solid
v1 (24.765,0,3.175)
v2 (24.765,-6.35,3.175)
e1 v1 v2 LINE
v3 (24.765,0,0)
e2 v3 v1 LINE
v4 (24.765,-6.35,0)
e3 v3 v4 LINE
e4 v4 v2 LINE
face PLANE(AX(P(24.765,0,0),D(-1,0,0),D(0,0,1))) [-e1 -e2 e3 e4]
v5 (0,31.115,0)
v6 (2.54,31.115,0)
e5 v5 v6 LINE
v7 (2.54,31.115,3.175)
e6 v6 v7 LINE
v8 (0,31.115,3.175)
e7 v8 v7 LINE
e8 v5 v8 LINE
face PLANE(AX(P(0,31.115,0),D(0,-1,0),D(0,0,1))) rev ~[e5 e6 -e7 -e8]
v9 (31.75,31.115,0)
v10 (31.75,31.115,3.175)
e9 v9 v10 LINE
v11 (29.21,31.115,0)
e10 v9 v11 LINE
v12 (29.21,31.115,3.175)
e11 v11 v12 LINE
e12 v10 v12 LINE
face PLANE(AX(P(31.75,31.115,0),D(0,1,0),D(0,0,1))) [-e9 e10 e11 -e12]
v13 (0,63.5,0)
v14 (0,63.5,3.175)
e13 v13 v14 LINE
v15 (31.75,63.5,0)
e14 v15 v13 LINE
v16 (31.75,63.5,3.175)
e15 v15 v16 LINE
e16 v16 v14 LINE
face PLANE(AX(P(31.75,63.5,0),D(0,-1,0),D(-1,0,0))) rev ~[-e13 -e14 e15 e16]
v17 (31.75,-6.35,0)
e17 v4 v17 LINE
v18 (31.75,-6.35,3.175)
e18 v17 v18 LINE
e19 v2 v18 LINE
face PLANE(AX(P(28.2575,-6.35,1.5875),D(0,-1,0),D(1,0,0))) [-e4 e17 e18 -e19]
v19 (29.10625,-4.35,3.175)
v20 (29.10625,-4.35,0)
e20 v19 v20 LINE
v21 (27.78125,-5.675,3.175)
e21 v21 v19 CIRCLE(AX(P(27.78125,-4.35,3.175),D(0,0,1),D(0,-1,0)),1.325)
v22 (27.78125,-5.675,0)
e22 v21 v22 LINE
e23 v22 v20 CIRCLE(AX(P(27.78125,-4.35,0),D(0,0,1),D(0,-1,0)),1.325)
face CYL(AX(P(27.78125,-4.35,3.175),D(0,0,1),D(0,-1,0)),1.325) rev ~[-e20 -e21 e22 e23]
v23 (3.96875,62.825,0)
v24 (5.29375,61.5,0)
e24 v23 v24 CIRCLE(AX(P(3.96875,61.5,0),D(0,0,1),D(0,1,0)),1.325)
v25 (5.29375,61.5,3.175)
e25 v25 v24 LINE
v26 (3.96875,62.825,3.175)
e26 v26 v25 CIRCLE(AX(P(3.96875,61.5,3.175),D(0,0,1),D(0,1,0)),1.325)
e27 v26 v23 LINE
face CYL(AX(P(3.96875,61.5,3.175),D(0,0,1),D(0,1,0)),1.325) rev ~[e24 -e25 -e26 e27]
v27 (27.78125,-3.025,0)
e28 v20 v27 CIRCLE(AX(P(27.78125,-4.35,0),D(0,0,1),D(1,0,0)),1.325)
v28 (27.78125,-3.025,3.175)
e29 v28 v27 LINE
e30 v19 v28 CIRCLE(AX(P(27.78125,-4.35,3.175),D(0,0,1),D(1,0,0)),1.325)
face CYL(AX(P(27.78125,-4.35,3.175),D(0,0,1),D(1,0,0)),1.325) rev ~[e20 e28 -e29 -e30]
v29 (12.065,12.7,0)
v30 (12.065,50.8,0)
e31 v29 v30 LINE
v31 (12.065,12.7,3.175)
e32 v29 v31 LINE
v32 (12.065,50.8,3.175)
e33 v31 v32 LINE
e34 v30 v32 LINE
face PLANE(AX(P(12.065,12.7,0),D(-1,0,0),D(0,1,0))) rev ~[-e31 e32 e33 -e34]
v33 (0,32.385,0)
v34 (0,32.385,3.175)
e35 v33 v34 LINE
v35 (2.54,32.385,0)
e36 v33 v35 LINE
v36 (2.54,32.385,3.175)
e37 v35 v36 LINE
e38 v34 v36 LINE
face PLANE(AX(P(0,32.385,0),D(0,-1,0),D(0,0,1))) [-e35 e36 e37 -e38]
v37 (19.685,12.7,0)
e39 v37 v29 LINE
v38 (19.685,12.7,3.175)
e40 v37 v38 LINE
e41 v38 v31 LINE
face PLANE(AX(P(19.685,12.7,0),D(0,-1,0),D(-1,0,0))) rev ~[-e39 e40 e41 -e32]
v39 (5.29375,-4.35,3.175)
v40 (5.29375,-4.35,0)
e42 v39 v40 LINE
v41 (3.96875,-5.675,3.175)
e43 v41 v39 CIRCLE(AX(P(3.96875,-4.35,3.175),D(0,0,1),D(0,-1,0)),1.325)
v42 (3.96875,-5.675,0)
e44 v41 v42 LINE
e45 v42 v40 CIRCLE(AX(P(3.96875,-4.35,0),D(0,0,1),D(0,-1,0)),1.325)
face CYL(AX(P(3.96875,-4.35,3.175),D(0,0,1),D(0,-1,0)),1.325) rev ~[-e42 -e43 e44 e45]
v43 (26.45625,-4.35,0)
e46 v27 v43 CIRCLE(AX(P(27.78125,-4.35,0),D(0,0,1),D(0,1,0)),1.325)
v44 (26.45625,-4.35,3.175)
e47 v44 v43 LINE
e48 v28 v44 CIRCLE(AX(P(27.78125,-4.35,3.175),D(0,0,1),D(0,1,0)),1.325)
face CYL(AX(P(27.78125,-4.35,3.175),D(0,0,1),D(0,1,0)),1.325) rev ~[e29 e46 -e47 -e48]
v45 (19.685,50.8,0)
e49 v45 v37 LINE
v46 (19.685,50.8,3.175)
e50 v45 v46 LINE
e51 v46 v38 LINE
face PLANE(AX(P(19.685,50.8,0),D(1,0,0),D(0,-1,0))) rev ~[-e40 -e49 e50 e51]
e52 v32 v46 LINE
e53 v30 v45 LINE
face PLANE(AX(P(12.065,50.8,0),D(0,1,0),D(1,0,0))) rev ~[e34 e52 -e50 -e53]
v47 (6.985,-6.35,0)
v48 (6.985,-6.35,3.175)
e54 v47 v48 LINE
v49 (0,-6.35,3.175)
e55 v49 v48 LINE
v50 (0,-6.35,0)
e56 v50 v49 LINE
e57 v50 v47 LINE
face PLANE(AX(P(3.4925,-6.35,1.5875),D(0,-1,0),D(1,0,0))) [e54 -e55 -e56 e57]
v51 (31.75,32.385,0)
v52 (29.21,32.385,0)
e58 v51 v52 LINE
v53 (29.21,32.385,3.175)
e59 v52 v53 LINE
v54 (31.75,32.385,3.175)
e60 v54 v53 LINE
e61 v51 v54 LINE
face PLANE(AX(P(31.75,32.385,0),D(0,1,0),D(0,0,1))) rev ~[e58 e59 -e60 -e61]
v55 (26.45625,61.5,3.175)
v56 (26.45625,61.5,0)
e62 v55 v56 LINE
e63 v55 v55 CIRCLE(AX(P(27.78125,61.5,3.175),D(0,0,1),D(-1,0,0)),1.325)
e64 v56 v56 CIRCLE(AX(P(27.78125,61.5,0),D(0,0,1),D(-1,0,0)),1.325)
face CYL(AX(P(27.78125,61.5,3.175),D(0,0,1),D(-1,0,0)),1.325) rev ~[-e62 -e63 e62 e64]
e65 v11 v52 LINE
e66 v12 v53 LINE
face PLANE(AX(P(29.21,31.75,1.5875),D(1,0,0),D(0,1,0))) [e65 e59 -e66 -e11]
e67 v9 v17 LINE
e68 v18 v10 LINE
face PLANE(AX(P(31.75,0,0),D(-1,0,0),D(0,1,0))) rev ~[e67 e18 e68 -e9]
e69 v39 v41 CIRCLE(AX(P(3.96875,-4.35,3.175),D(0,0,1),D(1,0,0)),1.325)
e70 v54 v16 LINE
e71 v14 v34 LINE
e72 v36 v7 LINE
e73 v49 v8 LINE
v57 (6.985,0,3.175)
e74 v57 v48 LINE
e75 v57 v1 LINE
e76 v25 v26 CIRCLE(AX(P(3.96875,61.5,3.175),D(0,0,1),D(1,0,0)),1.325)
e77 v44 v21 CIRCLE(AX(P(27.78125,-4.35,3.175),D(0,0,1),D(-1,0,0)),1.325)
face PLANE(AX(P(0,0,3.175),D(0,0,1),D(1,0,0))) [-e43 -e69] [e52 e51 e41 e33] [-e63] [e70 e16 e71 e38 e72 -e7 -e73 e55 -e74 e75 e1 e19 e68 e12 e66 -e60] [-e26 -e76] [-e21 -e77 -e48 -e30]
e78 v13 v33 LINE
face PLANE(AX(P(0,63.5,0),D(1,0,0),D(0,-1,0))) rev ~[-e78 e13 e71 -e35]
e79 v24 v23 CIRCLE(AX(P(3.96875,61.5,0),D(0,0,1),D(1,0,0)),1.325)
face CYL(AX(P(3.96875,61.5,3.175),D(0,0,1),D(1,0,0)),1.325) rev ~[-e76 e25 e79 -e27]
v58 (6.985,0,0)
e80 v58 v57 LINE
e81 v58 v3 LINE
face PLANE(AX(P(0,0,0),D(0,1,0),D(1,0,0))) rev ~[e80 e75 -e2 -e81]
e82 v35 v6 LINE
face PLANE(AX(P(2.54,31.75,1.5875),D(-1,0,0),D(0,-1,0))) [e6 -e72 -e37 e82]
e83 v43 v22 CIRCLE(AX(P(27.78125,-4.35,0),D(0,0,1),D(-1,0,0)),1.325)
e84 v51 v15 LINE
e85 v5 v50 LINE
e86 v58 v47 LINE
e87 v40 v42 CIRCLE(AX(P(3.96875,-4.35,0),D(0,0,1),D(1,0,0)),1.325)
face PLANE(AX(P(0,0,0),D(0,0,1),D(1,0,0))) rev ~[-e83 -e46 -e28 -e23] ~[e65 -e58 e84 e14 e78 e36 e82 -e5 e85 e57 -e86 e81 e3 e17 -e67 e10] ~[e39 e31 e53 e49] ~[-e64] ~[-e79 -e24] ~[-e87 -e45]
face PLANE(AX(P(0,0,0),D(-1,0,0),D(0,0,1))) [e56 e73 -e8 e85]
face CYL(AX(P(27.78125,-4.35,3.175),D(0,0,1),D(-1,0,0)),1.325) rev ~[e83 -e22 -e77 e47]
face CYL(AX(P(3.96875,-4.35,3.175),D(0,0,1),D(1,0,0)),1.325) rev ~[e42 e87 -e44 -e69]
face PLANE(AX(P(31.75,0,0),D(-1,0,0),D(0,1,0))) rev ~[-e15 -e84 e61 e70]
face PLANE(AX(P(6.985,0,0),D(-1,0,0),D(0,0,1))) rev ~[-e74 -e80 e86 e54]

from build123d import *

# Parameters (mm, degrees)
F1_DEPTH  = 3.175
F2_W      = 1.27
F2_H      = 3.175
F3_DEPTH  = 2.54
F4_W      = 1.27
F4_H      = 3.175
F5_DEPTH  = 2.54
F6_W      = 6.985
F6_H      = 3.175
F7_DEPTH  = 6.35
F9_DEPTH  = 25.4
F10_DEPTH = 25.4


# Not quite as in the source:
# - a feature names something its author has since deleted; it is built from what else it names


with BuildPart() as f1:
    # F0 (on Top) → F1 (new body)
    with BuildSketch(Plane.XY):
        Polygon((0, 63.5), (0, 0), (15.875, 0), (15.875, 12.7), (12.065, 12.7), (12.065, 50.8), (15.875, 50.8), (15.875, 63.5), align=None)
        Polygon((15.875, 12.7), (15.875, 0), (31.75, 0), (31.75, 63.5), (15.875, 63.5), (15.875, 50.8), (19.685, 50.8), (19.685, 12.7), align=None)
    extrude(amount=F1_DEPTH)

    # F2 (on face) → F3 (cut)
    with BuildSketch(Plane.YZ.offset(31.75)):
        with Locations((31.75, 1.5875)):
            Rectangle(F2_W, F2_H)
    extrude(amount=-F3_DEPTH, mode=Mode.SUBTRACT)

    # F4 (on face) → F5 (cut)
    with BuildSketch(Plane(origin=(0, 0, 0), x_dir=(0, -1, 0), z_dir=(-1, 0, 0))):
        with Locations((-31.75, 1.5875)):
            Rectangle(F4_W, F4_H)
    extrude(amount=-F5_DEPTH, mode=Mode.SUBTRACT)

    # F6 (on face) → F7 (join)
    with BuildSketch(Plane.XZ):
        with Locations((3.4925, 1.5875)):
            Rectangle(F6_W, F6_H)
        with Locations((28.2575, 1.5875)):
            Rectangle(F6_W, F6_H)
    extrude(amount=F7_DEPTH)

    # F8 (on face) → F9 (cut)
    with BuildSketch(Plane.XY.offset(3.175)):
        with BuildLine():
            ThreePointArc((5.29375, -4.35), (3.0318335149, -3.4130835149), (3.96875, -5.675))
            Line((3.96875, -5.675), (3.96875, -4.35))
            Line((3.96875, -4.35), (5.29375, -4.35))
        make_face()
        with BuildLine():
            Line((3.96875, -4.35), (3.96875, -5.675))
            ThreePointArc((3.96875, -5.675), (4.9056664851, -5.2869164851), (5.29375, -4.35))
            Line((5.29375, -4.35), (3.96875, -4.35))
        make_face()
        with BuildLine():
            ThreePointArc((27.78125, -3.025), (26.8443335149, -3.4130835149), (26.45625, -4.35))
            Line((26.45625, -4.35), (27.78125, -4.35))
            Line((27.78125, -4.35), (27.78125, -3.025))
        make_face()
    extrude(amount=-F9_DEPTH, mode=Mode.SUBTRACT)

    # F8 (on face) → F10 (cut)
    with BuildSketch(Plane.XY.offset(3.175)):
        with BuildLine():
            ThreePointArc((29.10625, 61.5), (27.78125, 62.825), (26.45625, 61.5))
            ThreePointArc((26.45625, 61.5), (27.78125, 60.175), (29.10625, 61.5))
        make_face()
        with BuildLine():
            ThreePointArc((5.29375, 61.5), (4.9056664851, 62.4369164851), (3.96875, 62.825))
            ThreePointArc((3.96875, 62.825), (3.0318335149, 60.5630835149), (5.29375, 61.5))
        make_face()
        with BuildLine():
            Line((27.78125, -4.35), (26.45625, -4.35))
            ThreePointArc((26.45625, -4.35), (26.8443335149, -5.2869164851), (27.78125, -5.675))
            ThreePointArc((27.78125, -5.675), (28.7181664851, -5.2869164851), (29.10625, -4.35))
            ThreePointArc((29.10625, -4.35), (28.7181664851, -3.4130835149), (27.78125, -3.025))
            Line((27.78125, -3.025), (27.78125, -4.35))
        make_face()
    extrude(amount=-F10_DEPTH, mode=Mode.SUBTRACT)


solid = f1.part
